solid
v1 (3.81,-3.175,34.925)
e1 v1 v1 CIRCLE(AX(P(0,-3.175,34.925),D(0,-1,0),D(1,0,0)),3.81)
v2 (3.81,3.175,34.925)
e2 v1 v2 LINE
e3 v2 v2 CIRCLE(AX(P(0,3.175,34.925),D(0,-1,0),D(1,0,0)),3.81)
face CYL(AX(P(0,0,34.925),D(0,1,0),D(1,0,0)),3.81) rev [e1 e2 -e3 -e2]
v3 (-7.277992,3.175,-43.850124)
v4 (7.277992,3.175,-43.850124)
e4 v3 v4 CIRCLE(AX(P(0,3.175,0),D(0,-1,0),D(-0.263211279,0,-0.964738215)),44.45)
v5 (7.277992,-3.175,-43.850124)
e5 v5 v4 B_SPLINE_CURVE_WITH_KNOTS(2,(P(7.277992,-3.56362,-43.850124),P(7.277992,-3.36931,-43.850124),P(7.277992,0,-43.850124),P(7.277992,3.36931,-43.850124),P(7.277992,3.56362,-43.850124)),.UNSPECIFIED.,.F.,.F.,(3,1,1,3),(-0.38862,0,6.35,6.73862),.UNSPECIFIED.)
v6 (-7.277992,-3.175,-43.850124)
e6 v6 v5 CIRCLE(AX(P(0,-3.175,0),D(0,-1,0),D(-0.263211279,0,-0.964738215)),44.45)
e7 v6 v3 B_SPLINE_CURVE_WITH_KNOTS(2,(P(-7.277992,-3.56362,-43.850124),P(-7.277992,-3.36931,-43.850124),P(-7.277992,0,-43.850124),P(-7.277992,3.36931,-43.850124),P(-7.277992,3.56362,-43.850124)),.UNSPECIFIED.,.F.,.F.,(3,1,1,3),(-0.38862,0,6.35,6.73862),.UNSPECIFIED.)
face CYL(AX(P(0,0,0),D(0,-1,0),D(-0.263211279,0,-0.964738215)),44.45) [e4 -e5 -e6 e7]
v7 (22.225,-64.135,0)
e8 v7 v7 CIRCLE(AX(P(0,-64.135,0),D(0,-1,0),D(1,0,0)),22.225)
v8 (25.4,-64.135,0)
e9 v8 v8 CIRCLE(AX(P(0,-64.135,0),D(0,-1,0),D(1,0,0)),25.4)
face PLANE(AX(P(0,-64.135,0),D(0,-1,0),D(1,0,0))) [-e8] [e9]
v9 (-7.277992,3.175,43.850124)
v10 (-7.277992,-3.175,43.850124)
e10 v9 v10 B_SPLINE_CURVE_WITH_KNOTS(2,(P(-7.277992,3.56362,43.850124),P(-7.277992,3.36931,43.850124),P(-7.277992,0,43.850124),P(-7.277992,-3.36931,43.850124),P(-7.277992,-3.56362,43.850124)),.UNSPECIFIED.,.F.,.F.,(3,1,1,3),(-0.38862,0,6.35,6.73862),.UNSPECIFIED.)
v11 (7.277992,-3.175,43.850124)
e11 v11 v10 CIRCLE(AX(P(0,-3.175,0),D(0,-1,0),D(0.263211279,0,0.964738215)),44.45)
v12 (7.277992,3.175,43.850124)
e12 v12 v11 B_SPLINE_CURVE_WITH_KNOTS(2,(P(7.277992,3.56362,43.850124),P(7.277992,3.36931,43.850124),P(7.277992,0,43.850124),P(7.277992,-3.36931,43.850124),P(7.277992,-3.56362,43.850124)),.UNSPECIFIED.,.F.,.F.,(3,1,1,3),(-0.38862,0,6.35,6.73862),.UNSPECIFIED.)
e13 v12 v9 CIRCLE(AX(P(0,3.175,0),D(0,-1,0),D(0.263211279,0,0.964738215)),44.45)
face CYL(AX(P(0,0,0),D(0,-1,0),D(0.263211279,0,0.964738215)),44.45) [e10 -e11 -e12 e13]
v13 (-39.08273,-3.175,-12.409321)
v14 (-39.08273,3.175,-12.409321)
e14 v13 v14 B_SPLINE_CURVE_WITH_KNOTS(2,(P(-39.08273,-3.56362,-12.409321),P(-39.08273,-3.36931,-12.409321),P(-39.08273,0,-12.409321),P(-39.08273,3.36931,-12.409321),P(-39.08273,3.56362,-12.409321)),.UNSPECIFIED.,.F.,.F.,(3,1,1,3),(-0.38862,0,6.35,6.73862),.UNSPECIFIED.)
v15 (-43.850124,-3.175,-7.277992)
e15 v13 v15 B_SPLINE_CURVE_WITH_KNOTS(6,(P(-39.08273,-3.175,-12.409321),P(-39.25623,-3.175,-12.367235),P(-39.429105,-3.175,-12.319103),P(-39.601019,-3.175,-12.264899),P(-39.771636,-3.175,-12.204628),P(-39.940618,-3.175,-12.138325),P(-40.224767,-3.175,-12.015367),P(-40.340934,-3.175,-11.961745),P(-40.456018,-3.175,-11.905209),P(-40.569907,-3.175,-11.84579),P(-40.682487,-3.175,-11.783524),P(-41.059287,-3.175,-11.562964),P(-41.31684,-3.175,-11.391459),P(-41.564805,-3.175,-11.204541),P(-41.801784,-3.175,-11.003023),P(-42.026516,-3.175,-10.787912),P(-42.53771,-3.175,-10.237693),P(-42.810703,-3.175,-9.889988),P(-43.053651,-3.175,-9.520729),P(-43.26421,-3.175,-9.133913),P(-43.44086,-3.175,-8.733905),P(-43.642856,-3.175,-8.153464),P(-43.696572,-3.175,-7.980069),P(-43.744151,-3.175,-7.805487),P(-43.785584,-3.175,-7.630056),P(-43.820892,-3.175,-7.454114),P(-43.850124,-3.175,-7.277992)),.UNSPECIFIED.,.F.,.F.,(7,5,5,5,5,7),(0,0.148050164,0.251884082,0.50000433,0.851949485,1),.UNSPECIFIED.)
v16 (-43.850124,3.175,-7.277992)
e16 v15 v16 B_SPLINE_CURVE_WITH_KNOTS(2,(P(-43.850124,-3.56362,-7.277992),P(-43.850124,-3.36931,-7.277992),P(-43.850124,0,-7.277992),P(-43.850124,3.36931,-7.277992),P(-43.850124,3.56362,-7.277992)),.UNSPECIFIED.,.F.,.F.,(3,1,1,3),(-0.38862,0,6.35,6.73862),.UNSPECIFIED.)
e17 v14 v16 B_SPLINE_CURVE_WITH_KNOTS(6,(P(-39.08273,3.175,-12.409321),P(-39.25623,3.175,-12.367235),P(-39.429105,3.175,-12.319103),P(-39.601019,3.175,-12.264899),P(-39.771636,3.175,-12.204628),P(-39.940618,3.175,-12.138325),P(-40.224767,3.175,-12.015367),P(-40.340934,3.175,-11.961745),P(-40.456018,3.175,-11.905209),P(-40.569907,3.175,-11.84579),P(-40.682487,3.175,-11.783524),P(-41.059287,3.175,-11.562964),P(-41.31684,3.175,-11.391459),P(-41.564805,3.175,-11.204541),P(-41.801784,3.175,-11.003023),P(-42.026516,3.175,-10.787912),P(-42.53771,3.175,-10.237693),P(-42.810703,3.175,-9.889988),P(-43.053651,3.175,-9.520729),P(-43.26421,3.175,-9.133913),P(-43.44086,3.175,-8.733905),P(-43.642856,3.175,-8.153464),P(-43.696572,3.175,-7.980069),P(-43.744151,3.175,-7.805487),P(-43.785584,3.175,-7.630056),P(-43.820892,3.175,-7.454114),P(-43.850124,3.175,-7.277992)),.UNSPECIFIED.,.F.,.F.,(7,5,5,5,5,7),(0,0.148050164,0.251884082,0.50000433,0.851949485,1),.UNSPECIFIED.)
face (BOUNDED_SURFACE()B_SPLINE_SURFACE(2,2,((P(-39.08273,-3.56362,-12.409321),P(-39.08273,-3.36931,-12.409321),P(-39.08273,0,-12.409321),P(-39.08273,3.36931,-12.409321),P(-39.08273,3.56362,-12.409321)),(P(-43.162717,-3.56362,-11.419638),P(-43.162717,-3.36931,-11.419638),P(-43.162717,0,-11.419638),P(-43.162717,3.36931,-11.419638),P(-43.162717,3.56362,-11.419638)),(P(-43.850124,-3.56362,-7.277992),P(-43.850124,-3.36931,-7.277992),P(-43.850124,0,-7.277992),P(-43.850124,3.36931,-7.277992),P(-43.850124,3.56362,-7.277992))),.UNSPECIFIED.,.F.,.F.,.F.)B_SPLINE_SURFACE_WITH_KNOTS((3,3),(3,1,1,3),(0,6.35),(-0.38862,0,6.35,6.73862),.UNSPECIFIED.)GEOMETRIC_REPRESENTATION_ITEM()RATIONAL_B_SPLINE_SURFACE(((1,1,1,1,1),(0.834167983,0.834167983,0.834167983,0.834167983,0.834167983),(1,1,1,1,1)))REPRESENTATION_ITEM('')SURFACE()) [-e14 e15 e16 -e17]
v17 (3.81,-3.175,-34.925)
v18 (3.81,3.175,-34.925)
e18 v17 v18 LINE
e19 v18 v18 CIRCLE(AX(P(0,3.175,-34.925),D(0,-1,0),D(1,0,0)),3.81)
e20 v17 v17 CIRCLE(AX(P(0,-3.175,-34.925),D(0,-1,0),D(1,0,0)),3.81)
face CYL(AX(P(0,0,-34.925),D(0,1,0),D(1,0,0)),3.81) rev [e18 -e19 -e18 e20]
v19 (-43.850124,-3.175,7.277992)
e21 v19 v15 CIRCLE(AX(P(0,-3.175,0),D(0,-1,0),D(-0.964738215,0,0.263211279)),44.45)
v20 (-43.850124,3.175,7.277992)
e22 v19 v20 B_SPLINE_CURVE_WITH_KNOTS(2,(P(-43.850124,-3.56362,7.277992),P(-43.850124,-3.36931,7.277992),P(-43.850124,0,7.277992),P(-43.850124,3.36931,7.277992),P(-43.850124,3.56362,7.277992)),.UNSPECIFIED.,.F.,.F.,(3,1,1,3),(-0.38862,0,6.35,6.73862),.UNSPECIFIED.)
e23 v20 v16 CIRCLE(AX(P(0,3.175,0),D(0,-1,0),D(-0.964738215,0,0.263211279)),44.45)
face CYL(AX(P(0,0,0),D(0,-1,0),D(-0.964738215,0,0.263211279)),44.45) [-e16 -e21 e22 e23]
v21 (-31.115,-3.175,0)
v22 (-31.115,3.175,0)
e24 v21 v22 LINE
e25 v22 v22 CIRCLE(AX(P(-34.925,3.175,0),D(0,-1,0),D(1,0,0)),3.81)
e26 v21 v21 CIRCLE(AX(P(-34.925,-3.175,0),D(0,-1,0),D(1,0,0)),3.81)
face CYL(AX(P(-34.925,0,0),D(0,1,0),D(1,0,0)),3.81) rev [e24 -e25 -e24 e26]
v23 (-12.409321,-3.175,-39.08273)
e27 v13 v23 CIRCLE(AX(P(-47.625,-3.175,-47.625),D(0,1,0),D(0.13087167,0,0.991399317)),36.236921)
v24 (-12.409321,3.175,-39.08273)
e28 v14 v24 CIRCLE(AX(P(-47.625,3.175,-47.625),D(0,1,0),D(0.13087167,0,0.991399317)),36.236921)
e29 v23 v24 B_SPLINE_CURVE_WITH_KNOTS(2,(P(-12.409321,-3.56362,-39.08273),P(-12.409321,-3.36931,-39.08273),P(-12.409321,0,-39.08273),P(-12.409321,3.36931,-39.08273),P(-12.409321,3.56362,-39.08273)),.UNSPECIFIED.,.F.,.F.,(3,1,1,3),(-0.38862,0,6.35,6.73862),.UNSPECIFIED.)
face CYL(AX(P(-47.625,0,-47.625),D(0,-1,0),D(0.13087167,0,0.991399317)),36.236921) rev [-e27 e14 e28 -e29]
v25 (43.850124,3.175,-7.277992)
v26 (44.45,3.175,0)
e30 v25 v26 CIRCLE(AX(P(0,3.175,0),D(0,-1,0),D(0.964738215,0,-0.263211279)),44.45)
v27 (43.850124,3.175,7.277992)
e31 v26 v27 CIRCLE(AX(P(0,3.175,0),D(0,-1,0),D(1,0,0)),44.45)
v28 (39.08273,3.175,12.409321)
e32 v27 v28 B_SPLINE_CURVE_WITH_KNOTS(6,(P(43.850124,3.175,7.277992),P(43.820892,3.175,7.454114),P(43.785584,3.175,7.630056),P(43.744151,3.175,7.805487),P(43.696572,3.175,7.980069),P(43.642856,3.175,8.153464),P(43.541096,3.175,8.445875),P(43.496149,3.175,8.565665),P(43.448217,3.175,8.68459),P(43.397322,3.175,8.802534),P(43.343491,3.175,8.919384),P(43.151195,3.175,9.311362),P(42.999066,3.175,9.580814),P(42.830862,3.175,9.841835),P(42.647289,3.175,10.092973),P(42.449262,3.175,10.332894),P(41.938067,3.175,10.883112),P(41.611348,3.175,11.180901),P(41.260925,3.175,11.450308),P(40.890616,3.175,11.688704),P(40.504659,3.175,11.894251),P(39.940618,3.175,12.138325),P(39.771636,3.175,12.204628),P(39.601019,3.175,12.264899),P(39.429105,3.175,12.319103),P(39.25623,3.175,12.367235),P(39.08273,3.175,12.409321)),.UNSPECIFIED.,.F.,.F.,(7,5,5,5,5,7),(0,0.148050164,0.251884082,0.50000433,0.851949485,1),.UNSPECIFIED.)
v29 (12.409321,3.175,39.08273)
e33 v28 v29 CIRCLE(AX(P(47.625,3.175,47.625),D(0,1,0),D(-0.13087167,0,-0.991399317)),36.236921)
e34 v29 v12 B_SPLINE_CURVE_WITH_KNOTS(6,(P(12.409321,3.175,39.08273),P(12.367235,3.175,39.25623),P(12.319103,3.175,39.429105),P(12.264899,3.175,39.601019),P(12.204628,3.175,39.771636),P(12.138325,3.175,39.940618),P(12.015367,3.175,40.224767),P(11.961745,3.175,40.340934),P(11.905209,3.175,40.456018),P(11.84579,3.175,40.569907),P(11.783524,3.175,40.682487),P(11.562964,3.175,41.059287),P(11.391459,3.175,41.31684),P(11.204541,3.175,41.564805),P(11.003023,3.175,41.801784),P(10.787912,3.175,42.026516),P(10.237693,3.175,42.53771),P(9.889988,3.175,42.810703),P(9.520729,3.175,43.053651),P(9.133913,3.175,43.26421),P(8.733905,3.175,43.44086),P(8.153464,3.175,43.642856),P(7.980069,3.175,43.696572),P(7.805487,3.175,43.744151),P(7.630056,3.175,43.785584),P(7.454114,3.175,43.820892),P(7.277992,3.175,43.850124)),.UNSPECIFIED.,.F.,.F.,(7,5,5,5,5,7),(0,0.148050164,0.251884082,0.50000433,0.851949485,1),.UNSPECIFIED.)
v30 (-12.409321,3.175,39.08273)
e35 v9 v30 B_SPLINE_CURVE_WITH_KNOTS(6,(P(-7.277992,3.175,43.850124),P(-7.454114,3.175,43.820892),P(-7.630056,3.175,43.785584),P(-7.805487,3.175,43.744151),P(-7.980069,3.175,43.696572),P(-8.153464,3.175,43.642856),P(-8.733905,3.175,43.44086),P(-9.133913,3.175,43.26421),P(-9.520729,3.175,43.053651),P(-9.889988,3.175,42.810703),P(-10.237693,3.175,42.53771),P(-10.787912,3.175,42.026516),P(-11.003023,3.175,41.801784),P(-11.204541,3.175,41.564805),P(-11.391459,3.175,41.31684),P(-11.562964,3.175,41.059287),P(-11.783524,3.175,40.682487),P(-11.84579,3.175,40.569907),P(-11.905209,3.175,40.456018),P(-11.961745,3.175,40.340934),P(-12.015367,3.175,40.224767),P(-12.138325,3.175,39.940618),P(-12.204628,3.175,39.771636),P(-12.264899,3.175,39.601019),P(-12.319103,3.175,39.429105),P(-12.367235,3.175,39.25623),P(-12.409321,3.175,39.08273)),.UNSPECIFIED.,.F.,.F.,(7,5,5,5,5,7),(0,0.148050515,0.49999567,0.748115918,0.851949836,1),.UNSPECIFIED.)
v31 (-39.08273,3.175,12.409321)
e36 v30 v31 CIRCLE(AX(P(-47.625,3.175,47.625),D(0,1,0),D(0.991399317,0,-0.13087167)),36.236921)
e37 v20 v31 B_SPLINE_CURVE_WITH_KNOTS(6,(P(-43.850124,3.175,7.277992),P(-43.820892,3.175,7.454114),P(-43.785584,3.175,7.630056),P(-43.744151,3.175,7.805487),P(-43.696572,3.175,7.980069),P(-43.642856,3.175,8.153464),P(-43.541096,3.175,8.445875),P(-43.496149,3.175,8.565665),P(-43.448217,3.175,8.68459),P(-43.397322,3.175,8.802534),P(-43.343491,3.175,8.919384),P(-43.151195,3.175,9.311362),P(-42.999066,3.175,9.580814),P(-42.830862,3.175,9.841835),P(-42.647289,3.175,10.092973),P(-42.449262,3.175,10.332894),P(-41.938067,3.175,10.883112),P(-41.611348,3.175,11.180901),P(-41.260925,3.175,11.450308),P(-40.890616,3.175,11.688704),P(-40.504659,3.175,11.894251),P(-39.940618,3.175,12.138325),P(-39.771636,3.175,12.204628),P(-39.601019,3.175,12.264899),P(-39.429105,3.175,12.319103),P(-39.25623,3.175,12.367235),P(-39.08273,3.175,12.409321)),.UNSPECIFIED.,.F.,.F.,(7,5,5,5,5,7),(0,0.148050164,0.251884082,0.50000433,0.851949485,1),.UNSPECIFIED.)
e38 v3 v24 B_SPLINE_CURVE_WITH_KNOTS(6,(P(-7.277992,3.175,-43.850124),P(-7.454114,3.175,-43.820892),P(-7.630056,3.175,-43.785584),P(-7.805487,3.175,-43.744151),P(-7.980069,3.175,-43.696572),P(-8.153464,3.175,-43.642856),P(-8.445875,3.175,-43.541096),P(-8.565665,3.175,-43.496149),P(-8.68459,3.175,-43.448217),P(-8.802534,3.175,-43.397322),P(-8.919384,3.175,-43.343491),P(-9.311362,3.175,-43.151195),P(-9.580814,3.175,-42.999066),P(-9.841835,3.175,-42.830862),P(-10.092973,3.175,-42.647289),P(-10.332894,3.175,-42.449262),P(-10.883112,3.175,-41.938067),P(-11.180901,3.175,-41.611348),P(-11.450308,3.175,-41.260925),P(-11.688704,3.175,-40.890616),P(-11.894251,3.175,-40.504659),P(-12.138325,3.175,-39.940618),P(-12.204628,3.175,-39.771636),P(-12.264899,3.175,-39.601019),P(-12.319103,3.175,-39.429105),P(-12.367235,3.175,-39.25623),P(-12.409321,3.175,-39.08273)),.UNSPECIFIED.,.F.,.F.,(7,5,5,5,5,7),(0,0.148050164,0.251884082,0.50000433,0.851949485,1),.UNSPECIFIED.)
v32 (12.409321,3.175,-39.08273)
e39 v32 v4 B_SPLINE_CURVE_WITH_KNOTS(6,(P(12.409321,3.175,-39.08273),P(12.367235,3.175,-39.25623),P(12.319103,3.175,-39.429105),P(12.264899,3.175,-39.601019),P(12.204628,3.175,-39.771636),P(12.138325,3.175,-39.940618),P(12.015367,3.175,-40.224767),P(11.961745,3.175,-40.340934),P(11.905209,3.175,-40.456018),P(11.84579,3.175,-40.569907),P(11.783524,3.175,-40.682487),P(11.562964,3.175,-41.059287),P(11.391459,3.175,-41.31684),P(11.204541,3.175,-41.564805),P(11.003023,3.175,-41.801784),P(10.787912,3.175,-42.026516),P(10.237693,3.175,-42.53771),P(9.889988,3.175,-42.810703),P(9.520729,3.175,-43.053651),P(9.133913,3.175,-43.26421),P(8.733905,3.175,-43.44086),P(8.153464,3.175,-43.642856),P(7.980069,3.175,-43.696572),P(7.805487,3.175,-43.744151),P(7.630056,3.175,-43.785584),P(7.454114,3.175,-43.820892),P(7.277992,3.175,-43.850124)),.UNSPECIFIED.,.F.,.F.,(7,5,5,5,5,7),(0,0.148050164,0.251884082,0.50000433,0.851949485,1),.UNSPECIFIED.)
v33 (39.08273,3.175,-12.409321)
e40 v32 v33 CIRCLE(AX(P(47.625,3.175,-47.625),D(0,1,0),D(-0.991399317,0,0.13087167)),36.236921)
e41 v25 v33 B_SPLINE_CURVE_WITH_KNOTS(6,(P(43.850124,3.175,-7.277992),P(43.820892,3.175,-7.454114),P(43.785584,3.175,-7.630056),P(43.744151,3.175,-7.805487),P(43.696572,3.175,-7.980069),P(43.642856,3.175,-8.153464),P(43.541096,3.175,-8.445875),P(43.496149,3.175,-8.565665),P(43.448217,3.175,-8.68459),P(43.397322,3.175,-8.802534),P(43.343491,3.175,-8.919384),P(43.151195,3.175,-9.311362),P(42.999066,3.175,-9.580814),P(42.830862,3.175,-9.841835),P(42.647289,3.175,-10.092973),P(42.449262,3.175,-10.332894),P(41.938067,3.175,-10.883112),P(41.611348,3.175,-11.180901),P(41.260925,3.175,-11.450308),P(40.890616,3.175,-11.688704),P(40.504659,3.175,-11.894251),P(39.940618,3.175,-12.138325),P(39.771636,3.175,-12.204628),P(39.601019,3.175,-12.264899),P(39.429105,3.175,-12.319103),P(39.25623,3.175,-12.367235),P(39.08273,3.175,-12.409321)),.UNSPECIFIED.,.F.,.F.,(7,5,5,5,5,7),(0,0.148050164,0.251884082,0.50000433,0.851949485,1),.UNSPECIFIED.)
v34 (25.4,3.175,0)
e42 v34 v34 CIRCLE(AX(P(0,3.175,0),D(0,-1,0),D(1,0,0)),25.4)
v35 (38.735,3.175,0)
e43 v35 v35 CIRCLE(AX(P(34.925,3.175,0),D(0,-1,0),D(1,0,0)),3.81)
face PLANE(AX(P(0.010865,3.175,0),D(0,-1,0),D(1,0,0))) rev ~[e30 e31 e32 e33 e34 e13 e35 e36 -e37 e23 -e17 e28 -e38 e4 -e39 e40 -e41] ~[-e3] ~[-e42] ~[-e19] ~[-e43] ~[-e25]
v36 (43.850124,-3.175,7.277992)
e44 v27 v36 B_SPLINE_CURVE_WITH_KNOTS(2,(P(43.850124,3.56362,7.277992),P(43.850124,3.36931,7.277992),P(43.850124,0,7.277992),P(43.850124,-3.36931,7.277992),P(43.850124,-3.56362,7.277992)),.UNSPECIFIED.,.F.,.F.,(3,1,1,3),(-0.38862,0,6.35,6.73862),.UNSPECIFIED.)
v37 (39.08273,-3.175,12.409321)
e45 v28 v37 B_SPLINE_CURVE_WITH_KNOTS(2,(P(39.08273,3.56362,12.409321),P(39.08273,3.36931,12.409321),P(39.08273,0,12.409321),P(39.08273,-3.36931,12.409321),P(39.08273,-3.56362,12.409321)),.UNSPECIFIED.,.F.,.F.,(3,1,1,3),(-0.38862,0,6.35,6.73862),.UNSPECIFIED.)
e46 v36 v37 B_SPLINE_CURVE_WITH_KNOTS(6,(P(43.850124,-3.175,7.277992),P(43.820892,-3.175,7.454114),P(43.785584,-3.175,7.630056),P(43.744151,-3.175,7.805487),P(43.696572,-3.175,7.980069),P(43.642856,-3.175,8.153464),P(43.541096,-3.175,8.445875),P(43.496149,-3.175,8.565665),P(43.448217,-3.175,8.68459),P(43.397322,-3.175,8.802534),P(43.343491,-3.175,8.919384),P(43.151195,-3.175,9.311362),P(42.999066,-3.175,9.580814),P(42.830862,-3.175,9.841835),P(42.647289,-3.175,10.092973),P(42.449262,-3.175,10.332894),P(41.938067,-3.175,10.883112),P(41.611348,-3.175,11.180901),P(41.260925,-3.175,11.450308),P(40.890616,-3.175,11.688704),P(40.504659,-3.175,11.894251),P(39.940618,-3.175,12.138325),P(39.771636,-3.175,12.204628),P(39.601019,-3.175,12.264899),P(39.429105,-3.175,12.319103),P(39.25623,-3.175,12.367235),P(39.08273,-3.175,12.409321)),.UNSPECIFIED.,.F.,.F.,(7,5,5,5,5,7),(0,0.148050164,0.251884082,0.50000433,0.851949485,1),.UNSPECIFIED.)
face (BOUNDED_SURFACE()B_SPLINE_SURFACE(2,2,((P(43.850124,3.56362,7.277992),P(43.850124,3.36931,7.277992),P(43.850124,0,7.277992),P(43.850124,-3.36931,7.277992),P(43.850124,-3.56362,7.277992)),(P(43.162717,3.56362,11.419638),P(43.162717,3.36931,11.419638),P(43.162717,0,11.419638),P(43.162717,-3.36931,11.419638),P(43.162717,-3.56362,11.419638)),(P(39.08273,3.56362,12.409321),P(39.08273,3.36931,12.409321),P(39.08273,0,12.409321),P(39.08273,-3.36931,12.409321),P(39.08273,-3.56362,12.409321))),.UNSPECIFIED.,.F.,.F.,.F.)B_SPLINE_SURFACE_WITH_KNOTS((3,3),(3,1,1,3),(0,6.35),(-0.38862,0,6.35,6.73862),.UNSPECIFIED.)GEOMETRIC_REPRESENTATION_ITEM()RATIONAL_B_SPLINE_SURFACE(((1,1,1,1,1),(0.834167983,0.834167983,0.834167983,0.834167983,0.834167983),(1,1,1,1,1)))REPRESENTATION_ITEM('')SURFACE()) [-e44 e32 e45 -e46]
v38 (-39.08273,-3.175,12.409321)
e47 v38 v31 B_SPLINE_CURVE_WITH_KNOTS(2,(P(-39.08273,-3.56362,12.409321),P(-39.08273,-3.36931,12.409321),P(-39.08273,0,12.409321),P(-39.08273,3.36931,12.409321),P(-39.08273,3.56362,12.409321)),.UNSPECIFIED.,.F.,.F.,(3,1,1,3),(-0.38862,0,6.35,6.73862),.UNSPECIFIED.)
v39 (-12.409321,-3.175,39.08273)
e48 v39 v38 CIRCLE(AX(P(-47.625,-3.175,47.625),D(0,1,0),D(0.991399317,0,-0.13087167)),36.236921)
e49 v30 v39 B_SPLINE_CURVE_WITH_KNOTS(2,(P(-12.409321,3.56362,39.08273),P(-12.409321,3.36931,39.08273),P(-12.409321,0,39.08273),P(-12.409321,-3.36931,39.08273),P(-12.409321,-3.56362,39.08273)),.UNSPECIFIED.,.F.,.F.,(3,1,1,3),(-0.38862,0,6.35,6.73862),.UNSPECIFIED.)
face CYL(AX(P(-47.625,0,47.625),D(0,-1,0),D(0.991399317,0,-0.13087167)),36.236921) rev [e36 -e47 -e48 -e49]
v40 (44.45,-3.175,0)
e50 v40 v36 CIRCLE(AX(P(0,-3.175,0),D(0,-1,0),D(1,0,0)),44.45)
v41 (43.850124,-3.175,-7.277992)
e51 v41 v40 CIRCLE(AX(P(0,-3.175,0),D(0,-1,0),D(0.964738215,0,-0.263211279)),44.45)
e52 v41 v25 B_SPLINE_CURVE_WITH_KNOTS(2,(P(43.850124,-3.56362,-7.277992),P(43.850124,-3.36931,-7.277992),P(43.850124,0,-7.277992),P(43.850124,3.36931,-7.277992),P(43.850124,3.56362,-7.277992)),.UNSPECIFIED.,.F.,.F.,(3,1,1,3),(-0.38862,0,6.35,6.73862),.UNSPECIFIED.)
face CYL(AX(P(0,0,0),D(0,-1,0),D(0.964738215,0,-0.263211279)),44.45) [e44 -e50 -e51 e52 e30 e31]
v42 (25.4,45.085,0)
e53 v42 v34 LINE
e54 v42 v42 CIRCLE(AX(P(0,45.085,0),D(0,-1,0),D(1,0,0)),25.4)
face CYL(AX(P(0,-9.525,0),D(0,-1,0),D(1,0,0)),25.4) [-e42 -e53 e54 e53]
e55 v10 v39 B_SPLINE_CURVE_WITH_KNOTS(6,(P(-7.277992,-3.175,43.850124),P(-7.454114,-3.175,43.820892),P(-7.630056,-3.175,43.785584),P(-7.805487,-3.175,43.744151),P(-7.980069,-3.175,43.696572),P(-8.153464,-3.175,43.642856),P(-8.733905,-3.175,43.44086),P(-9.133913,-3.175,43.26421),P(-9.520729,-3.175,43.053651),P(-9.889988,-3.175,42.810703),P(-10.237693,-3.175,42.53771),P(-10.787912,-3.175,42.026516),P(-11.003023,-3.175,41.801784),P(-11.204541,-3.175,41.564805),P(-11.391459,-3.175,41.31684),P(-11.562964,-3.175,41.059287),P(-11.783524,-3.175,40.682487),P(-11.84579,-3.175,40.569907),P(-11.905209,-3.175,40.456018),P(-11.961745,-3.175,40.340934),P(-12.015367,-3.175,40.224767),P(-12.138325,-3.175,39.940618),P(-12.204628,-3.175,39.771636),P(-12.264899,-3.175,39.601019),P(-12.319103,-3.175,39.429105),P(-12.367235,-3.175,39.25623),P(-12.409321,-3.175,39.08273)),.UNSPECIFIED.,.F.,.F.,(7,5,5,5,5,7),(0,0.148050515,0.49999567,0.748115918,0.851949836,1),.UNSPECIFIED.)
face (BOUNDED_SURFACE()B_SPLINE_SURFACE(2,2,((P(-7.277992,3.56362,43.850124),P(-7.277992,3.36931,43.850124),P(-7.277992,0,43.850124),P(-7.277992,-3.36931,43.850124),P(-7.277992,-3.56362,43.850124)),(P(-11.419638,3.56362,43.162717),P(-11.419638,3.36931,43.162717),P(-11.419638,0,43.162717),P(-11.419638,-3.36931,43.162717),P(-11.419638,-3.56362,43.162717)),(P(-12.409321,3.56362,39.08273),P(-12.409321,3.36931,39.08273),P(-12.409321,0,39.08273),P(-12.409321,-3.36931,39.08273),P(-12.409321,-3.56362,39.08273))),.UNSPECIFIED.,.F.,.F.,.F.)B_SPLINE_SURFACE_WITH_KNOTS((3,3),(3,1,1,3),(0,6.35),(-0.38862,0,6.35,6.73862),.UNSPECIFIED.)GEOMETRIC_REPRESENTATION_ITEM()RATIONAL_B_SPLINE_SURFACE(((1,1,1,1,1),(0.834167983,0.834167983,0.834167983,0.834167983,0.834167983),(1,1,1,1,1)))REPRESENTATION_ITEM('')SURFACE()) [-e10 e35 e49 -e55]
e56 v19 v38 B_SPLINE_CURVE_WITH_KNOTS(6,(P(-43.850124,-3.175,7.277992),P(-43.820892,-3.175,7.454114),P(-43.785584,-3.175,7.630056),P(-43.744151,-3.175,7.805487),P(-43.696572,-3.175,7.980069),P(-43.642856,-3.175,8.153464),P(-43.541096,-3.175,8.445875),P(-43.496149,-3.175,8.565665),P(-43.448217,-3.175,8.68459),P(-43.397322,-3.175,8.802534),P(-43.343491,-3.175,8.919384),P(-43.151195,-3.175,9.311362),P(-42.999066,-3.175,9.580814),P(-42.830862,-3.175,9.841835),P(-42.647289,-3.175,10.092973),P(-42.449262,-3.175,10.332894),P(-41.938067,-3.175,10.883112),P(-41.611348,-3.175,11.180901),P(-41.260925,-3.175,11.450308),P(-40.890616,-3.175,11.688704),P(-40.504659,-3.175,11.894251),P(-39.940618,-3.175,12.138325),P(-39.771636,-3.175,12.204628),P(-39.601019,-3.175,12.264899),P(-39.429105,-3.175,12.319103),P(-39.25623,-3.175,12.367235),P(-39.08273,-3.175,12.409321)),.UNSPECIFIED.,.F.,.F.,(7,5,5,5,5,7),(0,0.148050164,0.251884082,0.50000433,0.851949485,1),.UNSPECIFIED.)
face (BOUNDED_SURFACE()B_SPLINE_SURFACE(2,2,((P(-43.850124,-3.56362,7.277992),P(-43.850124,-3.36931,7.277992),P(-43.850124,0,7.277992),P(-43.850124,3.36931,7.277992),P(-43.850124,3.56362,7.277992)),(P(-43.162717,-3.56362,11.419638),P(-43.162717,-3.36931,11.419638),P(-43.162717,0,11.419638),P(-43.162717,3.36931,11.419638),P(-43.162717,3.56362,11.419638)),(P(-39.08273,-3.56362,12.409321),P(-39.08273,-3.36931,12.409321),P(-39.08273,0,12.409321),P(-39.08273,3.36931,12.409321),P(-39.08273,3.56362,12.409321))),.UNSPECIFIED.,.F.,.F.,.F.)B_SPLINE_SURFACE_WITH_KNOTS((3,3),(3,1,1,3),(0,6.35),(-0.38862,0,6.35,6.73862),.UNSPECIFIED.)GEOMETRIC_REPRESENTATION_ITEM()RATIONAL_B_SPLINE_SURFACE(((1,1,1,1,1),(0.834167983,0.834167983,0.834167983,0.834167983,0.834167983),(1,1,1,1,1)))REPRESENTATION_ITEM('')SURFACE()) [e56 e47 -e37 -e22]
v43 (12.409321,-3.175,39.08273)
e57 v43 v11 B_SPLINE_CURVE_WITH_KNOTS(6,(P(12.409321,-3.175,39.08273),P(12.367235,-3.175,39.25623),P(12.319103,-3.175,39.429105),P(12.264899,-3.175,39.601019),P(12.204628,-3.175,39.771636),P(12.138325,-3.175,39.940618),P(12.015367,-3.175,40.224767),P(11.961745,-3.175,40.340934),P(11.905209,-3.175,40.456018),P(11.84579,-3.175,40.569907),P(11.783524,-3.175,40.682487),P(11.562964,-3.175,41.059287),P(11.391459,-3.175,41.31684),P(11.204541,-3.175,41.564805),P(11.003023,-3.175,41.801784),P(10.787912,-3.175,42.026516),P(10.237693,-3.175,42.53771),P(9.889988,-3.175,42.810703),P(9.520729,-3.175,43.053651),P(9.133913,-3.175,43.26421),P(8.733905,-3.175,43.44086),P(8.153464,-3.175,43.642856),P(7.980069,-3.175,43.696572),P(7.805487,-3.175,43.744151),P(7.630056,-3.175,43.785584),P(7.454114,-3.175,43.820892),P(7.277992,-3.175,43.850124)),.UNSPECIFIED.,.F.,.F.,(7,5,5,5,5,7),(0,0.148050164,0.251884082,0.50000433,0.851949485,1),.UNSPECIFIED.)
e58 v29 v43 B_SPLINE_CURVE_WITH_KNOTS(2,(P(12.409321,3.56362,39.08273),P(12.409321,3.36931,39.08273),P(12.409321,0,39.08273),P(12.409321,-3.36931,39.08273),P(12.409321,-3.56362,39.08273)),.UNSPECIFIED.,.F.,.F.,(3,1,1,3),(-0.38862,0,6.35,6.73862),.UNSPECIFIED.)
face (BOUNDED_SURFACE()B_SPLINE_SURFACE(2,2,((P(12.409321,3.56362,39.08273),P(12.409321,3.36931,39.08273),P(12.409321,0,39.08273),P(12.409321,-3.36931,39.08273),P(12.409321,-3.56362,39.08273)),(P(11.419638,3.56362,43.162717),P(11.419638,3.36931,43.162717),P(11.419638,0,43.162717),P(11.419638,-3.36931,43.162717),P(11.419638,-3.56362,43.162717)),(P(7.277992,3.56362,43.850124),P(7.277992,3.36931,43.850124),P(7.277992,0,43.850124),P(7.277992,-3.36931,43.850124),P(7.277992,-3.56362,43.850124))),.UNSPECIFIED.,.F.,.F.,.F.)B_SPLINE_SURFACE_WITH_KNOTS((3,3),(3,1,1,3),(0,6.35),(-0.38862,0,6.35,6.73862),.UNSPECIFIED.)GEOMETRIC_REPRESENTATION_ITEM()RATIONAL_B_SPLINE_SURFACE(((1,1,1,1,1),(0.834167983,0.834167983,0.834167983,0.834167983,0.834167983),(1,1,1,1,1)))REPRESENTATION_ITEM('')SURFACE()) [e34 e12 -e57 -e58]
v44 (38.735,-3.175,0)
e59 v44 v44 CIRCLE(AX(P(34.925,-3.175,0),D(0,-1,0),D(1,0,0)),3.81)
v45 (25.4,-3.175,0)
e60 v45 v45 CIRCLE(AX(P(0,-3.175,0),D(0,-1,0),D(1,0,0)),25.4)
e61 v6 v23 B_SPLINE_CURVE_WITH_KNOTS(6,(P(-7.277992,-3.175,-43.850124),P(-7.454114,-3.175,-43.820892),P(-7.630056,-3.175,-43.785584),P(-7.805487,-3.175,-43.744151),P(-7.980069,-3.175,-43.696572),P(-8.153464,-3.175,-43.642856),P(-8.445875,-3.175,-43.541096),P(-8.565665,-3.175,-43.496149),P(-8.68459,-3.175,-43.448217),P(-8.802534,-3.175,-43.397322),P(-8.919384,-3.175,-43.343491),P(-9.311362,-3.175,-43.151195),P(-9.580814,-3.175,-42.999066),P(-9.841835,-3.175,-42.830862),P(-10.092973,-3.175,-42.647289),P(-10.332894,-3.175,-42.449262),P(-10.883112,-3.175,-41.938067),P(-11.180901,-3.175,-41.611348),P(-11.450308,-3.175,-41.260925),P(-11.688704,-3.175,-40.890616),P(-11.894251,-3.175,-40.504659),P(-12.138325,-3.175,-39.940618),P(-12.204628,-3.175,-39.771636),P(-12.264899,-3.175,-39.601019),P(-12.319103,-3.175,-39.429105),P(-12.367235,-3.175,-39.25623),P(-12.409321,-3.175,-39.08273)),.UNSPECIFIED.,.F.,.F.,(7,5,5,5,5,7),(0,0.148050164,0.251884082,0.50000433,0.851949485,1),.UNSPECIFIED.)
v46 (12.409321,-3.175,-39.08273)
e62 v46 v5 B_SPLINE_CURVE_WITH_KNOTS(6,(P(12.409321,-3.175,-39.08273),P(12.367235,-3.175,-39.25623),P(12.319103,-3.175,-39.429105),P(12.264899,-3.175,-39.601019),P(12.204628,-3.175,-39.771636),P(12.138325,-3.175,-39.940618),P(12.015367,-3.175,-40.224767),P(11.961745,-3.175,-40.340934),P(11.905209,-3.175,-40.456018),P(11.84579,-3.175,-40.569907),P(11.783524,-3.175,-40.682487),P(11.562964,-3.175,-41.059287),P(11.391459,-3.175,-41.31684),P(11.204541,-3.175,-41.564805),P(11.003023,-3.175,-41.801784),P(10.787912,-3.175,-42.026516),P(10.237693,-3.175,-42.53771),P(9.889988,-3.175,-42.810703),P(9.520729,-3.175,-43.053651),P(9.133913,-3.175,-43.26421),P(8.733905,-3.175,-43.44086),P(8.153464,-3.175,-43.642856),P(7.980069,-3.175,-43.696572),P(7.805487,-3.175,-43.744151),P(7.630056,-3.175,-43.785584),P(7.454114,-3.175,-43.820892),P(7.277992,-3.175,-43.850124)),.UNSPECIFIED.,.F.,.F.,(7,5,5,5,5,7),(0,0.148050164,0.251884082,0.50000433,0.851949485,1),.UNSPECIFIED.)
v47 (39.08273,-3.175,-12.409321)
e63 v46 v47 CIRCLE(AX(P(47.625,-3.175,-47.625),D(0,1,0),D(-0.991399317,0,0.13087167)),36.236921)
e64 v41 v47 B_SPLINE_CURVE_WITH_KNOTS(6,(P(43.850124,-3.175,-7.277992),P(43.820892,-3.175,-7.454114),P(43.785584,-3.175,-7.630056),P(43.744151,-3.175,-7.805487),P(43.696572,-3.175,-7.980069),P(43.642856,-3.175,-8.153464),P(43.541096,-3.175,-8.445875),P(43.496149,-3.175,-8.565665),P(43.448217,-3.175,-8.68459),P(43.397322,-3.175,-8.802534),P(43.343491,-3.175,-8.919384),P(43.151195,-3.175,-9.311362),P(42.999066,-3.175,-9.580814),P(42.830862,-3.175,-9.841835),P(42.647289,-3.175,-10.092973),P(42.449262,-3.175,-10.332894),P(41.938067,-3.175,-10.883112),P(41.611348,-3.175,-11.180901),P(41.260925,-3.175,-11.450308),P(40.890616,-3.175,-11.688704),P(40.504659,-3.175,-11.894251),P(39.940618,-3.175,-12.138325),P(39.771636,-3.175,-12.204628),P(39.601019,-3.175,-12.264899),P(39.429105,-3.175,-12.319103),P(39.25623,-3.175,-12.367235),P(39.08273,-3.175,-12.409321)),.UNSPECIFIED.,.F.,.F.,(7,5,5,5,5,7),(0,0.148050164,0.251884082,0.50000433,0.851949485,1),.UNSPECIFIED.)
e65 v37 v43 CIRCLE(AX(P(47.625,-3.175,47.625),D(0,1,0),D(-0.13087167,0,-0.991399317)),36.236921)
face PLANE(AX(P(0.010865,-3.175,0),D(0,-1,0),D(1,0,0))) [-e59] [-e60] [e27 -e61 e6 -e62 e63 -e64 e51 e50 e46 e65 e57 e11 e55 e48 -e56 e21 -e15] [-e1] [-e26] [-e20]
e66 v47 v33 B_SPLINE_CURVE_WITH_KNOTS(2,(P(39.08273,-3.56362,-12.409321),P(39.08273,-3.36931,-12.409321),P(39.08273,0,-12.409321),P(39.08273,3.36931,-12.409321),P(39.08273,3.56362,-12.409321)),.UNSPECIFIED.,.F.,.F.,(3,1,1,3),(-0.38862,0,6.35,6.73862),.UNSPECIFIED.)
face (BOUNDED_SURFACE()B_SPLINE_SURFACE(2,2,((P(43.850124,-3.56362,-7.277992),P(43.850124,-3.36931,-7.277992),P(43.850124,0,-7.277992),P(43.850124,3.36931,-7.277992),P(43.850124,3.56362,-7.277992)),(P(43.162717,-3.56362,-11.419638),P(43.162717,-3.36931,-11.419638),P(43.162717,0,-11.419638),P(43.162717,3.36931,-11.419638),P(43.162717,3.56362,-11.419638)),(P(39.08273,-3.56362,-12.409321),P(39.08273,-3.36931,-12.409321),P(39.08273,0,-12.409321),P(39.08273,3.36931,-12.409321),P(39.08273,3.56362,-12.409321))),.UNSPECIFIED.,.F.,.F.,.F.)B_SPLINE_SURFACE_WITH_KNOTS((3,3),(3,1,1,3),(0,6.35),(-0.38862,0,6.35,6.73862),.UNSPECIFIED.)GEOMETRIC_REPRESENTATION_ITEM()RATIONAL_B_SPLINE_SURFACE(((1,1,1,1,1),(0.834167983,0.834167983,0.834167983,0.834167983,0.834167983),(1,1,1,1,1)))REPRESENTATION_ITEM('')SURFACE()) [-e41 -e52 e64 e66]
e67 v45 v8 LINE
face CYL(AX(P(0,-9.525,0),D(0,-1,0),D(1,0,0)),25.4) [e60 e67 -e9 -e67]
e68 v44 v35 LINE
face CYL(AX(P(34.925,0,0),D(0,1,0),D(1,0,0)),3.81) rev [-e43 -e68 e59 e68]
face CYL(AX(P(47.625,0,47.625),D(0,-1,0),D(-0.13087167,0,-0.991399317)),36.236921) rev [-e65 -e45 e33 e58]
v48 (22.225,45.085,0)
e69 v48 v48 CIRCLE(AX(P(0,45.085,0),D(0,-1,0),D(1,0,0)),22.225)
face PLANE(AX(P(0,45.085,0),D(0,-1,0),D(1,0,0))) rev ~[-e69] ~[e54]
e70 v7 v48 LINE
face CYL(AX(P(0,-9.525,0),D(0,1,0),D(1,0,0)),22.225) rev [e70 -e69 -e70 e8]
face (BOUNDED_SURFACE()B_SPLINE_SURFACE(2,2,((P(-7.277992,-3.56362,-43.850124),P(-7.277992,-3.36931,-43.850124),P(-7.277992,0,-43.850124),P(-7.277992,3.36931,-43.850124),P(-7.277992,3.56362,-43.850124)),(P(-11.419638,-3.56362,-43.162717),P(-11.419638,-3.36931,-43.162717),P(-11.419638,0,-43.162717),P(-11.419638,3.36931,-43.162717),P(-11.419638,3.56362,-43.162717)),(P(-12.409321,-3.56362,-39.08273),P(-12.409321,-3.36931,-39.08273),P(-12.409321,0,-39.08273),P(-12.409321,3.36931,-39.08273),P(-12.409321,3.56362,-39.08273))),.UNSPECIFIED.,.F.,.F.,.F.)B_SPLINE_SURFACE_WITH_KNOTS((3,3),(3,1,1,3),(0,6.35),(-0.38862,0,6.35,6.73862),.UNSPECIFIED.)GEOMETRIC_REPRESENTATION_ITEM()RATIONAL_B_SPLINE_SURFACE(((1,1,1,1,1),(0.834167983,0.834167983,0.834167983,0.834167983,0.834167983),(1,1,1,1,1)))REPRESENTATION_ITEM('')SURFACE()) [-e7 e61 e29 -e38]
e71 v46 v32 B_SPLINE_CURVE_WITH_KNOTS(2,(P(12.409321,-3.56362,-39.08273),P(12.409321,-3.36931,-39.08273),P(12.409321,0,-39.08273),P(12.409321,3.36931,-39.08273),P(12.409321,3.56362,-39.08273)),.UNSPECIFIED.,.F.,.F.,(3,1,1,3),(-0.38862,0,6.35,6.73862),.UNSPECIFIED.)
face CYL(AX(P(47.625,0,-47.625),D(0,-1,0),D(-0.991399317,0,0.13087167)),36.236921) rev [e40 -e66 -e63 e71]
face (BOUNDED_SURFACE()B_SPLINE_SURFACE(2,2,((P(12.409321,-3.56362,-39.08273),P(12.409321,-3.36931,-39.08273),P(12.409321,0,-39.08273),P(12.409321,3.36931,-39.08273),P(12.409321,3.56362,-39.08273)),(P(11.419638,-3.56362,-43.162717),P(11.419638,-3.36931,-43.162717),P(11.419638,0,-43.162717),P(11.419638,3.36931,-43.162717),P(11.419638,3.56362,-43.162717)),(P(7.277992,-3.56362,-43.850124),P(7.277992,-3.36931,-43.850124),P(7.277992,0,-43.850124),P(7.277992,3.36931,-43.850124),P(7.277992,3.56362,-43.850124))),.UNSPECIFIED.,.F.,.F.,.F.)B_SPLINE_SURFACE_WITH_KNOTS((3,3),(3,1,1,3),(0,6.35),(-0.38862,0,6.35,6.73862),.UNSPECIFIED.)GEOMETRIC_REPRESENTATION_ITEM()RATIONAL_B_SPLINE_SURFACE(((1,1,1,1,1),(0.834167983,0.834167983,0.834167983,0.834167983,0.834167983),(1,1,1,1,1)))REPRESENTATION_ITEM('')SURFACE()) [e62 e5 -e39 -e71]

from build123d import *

# Parameters (mm, degrees)
F1_R     = 25.4
F1_R_2   = 22.225
F2_DEPTH = 54.61
F3_R     = 3.81
F3_R_2   = 25.4
F4_DEPTH = 3.175
F5_R     = 6.35


with BuildPart() as f2:
    # F1 (on offset) → F2 (new body, symmetric)
    with BuildSketch(Plane.XZ.offset(9.525)):
        Circle(F1_R)
        Circle(F1_R_2, mode=Mode.SUBTRACT)
    extrude(amount=F2_DEPTH, both=True)

    # F3 (on Front) → F4 (join, symmetric)
    with BuildSketch(Plane.XZ):
        with BuildLine():
            ThreePointArc((42.8826136347, -11.6997413585), (44.0564108619, -5.902131985), (44.45, 0))
            ThreePointArc((44.45, 0), (44.0564108619, 5.902131985), (42.8826136347, 11.6997413585))
            ThreePointArc((42.8826136347, 11.6997413585), (22.0016274966, 22.0016274966), (11.6997413585, 42.8826136347))
            ThreePointArc((11.6997413585, 42.8826136347), (0, 44.45), (-11.6997413585, 42.8826136347))
            ThreePointArc((-11.6997413585, 42.8826136347), (-22.0016274966, 22.0016274966), (-42.8826136347, 11.6997413585))
            ThreePointArc((-42.8826136347, 11.6997413585), (-44.45, 0), (-42.8826136347, -11.6997413585))
            ThreePointArc((-42.8826136347, -11.6997413585), (-22.0016274966, -22.0016274966), (-11.6997413585, -42.8826136347))
            ThreePointArc((-11.6997413585, -42.8826136347), (0, -44.45), (11.6997413585, -42.8826136347))
            ThreePointArc((11.6997413585, -42.8826136347), (22.0016274966, -22.0016274966), (42.8826136347, -11.6997413585))
        make_face()
        with Locations((0, -34.925)):
            Circle(F3_R, mode=Mode.SUBTRACT)
        with Locations((-34.925, 0)):
            Circle(F3_R, mode=Mode.SUBTRACT)
        Circle(F3_R_2, mode=Mode.SUBTRACT)
        with Locations((34.925, 0)):
            Circle(F3_R, mode=Mode.SUBTRACT)
        with Locations((0, 34.925)):
            Circle(F3_R, mode=Mode.SUBTRACT)
    extrude(amount=F4_DEPTH, both=True)

    # F5
    f5_edges = [f2.edges().sort_by_distance(p)[0] for p in [
        (11.699741, 0, 42.882614),
        (-42.882614, 0, 11.699741),
        (-11.699741, 0, -42.882614),
        (42.882614, 0, -11.699741),
        (42.882614, 0, 11.699741),
        (-11.699741, 0, 42.882614),
        (-42.882614, 0, -11.699741),
        (11.699741, 0, -42.882614),
    ]]
    fillet(f5_edges, radius=F5_R)


solid = f2.part
